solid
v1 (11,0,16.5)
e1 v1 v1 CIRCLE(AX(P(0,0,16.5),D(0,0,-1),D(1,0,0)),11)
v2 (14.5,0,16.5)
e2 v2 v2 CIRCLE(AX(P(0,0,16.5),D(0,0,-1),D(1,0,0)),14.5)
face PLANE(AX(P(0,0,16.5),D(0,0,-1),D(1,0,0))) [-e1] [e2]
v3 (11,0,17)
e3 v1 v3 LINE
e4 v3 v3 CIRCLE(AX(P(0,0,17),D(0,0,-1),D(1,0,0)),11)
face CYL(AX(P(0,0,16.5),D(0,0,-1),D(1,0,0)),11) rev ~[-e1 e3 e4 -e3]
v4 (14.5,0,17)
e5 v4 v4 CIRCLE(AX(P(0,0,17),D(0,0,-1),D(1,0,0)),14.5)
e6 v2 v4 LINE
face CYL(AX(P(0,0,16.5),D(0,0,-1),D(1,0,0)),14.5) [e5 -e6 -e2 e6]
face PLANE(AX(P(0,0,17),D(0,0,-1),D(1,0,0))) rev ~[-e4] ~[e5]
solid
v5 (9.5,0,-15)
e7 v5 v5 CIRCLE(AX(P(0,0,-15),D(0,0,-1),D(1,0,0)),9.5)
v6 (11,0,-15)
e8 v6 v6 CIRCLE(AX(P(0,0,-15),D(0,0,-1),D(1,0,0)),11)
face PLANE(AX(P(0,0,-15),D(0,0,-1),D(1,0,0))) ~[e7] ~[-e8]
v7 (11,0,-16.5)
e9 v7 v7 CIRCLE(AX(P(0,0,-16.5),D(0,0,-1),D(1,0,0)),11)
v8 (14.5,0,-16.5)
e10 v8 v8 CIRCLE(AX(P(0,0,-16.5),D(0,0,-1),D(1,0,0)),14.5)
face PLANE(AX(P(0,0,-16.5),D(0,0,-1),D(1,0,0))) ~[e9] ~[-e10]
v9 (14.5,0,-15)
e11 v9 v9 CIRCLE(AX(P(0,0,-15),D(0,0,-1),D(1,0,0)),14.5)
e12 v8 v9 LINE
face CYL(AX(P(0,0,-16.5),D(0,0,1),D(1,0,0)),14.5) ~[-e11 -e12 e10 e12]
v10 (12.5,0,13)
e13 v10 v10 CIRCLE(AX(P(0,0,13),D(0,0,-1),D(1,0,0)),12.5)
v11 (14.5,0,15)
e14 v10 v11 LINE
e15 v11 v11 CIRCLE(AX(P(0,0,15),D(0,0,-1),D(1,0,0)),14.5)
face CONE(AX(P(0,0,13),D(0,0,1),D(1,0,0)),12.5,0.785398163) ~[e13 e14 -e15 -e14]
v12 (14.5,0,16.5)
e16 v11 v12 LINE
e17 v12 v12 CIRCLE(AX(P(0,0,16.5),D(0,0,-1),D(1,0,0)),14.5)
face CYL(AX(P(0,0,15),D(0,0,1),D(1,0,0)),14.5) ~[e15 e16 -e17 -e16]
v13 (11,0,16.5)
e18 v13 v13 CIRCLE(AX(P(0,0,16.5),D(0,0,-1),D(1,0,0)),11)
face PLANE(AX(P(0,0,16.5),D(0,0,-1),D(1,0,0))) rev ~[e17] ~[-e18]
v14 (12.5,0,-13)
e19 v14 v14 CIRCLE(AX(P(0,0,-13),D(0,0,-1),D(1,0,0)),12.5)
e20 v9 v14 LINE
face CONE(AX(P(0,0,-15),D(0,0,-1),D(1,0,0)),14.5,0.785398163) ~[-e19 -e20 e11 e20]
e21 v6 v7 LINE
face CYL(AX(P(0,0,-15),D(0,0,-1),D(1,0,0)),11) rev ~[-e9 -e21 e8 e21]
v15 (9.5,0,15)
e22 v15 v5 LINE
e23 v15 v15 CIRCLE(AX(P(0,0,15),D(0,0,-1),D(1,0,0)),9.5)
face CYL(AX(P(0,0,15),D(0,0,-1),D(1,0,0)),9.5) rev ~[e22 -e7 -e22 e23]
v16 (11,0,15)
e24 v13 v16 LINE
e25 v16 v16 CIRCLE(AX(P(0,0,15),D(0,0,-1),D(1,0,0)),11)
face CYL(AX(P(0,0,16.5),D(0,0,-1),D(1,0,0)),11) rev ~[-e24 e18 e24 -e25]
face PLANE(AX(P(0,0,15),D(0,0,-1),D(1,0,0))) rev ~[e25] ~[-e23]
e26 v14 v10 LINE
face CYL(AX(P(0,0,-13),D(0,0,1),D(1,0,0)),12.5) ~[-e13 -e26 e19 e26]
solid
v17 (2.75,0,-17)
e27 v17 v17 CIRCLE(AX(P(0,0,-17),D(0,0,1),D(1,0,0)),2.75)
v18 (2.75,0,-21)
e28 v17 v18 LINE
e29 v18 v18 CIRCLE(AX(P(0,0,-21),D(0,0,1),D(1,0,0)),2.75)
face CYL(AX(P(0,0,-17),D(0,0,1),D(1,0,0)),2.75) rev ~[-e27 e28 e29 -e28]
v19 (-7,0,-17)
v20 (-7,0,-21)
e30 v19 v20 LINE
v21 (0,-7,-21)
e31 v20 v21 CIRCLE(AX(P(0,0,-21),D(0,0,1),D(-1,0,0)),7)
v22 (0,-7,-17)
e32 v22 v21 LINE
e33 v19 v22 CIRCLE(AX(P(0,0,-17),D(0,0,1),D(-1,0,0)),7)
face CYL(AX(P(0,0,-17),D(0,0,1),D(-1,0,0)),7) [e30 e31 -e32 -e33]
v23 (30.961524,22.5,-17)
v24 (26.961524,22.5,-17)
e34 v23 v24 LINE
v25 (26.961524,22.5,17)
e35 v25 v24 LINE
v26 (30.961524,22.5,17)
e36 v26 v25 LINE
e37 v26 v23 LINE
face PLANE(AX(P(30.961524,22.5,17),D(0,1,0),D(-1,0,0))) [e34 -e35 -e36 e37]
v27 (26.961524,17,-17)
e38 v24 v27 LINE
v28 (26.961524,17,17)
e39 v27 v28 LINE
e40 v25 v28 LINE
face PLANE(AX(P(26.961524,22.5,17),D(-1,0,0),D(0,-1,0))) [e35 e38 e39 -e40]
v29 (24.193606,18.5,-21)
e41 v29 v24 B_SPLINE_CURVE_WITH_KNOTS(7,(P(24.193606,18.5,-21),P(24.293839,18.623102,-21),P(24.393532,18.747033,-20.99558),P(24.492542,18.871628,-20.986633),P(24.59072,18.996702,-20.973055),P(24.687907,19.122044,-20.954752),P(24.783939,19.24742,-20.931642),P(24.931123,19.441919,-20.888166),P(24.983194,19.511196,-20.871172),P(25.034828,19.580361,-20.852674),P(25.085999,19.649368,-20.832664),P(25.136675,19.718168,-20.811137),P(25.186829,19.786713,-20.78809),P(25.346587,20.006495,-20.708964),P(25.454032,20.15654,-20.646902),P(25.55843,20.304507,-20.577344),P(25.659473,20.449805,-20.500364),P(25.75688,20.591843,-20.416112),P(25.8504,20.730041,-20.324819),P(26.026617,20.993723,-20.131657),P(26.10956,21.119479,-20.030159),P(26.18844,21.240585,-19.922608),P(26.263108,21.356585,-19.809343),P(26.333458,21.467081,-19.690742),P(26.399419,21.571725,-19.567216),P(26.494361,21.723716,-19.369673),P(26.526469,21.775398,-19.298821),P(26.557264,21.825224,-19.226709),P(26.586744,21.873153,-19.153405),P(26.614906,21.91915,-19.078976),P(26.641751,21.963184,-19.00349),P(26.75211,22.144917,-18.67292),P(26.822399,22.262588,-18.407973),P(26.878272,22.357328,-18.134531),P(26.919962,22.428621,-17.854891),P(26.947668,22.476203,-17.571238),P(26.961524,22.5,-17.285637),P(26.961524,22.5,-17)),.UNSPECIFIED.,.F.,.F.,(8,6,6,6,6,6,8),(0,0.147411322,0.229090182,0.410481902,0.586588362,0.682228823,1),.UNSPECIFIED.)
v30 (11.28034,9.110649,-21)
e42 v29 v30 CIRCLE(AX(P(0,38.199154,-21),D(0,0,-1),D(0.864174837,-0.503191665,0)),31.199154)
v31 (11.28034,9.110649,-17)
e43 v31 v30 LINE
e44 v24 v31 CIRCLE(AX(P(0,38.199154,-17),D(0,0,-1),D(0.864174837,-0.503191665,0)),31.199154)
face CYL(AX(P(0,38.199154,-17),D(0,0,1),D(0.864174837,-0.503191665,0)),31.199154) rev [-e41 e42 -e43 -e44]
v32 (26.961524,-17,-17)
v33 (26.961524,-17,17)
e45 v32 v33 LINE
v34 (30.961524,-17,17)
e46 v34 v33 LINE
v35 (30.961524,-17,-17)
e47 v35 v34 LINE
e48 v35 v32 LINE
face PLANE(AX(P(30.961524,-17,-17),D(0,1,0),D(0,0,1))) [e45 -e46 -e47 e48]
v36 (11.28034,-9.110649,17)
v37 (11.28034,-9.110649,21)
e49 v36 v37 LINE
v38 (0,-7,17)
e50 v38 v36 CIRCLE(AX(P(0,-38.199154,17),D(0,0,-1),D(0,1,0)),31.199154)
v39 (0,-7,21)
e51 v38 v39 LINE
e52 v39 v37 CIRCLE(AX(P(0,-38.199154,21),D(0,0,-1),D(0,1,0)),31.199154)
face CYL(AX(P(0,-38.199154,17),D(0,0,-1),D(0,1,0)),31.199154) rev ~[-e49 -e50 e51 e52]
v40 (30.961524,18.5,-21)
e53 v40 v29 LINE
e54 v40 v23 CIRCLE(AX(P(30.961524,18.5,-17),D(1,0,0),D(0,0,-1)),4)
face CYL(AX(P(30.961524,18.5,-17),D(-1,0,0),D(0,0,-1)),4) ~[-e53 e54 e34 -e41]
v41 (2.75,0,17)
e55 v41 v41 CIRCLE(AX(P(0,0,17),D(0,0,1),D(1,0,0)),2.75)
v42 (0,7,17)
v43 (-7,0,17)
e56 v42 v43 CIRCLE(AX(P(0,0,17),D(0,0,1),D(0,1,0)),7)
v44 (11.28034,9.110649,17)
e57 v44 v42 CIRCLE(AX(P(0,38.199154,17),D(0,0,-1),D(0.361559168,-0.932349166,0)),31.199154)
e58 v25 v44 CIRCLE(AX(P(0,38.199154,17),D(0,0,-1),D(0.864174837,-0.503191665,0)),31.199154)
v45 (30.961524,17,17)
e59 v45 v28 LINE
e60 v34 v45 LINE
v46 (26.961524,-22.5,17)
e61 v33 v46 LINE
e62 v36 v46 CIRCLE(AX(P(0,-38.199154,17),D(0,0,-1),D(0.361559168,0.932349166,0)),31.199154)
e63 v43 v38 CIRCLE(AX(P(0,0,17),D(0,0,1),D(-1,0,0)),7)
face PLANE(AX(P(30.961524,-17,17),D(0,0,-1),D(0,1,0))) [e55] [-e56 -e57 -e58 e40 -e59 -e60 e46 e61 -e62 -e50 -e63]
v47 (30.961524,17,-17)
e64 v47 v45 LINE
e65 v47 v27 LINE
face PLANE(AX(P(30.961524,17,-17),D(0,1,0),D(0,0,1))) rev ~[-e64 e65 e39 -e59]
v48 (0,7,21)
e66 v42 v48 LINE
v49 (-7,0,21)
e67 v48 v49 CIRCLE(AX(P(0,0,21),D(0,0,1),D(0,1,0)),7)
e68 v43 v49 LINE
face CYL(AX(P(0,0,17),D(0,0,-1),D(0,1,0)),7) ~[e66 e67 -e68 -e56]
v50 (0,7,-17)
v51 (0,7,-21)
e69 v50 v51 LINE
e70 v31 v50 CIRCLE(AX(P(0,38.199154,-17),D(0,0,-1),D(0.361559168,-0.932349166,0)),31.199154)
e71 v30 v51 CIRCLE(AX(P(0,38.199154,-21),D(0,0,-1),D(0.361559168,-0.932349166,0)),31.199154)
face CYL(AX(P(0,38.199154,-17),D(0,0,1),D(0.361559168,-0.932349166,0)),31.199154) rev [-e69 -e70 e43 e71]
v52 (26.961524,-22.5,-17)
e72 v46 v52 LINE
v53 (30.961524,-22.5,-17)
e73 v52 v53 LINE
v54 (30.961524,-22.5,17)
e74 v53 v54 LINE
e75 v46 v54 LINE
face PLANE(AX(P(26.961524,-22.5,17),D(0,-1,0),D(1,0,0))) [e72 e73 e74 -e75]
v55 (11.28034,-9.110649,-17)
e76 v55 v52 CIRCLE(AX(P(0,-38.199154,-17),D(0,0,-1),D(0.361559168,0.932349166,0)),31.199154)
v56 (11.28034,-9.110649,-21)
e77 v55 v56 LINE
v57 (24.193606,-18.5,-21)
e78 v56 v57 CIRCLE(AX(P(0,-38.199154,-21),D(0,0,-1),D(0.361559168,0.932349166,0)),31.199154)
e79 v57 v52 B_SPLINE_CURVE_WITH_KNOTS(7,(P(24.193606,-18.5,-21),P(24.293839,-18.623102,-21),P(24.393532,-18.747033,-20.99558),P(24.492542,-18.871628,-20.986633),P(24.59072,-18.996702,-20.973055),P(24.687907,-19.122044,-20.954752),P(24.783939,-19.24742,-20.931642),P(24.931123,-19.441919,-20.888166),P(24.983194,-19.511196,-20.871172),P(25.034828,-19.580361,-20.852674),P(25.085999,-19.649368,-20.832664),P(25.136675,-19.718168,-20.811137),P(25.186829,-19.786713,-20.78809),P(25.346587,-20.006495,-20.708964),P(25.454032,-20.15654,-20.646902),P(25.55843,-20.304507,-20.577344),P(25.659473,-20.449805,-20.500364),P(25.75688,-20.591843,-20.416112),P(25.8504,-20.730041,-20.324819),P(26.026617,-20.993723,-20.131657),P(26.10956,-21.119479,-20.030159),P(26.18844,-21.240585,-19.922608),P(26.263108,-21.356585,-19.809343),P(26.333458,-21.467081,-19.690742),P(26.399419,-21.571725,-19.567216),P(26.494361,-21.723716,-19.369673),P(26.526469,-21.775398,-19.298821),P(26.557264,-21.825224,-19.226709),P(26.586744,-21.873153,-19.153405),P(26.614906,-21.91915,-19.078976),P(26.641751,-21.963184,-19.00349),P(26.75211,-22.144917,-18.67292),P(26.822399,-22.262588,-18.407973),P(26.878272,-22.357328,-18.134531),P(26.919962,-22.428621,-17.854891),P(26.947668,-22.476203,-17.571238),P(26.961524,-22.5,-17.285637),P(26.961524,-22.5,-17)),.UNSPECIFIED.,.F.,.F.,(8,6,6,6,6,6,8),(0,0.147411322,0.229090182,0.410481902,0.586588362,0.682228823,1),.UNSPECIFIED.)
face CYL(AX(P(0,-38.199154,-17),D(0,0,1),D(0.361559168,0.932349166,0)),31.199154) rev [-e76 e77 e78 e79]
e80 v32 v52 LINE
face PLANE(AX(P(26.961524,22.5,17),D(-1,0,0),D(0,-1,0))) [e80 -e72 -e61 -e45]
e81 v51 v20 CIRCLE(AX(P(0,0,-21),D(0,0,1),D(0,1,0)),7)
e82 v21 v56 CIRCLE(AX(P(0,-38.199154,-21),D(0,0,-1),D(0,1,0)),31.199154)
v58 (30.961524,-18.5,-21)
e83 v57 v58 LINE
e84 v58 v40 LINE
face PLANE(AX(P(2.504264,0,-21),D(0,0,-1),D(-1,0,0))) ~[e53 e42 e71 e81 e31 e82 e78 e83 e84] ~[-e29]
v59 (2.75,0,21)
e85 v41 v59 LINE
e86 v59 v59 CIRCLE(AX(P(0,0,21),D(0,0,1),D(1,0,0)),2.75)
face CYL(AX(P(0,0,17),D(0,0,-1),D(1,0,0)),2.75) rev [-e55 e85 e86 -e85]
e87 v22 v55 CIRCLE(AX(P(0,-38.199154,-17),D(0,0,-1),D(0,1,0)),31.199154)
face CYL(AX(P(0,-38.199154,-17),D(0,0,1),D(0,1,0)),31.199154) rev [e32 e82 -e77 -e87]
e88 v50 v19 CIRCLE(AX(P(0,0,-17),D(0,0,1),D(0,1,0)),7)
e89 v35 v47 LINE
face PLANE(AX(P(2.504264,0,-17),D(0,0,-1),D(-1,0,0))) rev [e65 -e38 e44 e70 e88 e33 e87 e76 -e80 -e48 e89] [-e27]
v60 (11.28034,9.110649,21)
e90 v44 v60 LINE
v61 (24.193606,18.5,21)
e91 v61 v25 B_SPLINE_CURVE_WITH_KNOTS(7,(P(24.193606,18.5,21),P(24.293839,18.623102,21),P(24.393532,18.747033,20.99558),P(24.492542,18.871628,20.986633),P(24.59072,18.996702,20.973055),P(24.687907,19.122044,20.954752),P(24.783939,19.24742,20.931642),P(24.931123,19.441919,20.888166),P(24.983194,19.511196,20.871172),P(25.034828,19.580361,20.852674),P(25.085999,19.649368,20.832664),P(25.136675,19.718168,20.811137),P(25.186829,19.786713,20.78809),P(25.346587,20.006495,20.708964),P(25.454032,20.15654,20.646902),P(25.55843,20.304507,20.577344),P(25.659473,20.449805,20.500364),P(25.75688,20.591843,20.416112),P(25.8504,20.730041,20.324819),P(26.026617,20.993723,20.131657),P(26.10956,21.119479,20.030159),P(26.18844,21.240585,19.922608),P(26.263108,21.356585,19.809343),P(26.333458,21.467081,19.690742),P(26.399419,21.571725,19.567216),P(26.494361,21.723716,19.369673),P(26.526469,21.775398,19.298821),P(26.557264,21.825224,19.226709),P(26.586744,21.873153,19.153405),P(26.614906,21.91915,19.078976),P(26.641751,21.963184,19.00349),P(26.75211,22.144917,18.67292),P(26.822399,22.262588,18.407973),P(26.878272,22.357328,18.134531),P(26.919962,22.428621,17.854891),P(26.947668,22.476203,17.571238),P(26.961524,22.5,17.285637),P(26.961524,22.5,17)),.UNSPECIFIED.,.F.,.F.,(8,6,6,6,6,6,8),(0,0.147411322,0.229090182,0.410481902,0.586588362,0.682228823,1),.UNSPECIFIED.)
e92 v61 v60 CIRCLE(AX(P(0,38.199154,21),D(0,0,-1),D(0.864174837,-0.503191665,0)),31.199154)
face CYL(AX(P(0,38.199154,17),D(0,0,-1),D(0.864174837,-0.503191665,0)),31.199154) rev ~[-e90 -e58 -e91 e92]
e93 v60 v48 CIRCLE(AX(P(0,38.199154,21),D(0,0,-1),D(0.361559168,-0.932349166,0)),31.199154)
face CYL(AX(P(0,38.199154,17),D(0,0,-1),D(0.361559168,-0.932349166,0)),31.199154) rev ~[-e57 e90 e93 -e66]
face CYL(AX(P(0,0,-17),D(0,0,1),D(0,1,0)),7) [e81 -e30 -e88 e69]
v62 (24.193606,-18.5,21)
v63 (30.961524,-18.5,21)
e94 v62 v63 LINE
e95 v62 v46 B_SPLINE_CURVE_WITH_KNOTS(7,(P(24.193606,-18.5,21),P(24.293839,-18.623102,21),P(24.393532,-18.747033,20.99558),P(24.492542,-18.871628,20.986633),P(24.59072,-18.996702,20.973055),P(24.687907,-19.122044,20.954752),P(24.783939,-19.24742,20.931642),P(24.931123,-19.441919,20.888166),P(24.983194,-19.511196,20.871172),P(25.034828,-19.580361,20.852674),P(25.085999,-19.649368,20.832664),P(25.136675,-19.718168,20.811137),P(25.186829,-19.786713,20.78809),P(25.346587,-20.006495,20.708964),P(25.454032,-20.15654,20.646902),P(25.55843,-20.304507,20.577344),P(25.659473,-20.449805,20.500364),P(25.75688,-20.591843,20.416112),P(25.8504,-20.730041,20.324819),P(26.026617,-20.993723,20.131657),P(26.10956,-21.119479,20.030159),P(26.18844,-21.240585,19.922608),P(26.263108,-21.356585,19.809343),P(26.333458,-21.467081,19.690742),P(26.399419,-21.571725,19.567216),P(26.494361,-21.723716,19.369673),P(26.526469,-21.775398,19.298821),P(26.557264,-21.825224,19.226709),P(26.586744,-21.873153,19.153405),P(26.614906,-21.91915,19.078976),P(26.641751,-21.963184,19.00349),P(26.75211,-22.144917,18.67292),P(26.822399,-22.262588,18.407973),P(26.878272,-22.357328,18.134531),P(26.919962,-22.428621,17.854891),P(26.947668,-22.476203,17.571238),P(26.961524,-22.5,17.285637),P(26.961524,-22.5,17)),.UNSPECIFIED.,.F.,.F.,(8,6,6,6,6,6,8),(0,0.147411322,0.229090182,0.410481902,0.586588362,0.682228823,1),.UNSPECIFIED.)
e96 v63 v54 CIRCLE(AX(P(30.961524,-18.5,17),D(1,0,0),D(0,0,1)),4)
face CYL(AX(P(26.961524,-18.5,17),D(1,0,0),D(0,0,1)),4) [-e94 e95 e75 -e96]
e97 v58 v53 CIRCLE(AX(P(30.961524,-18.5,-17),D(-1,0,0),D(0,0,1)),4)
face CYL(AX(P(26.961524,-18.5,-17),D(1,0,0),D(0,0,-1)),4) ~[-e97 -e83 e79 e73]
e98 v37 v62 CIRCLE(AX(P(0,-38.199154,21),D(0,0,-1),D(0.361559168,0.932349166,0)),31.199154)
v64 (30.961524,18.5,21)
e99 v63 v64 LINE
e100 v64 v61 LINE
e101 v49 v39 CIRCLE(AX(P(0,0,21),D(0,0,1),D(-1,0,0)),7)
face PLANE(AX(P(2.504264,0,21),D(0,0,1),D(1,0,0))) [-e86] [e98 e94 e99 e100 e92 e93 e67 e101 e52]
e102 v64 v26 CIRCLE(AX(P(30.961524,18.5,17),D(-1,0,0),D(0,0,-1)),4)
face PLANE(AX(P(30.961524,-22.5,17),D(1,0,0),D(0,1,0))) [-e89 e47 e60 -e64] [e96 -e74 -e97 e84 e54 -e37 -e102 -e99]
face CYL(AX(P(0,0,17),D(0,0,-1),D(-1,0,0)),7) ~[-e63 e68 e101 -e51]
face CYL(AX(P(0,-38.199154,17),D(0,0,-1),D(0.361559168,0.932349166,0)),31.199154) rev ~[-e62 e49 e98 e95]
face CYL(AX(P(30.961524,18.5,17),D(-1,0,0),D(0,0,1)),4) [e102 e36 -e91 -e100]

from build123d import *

# Parameters (mm, degrees)
F2_DEPTH = 0.5
F3_R     = 2.75
F4_DEPTH = 4
F6_DEPTH = 34
F7_R     = 4
F8_W     = 34
F8_H     = 34
F9_DEPTH = 4


# Not quite as in the source:
# - a feature names something its author has since deleted; it is built from what else it names


with BuildPart() as f1:
    # F0 (on Front) → F1 (revolve)
    with BuildSketch(Plane.XZ):
        Polygon((14.5, 16.5), (11, 16.5), (11, 15), (9.5, 15), (9.5, 0), (9.5, -15), (11, -15), (11, -16.5), (14.5, -16.5), (14.5, -15), (12.5, -13), (12.5, 0), (12.5, 13), (14.5, 15), align=None)
    revolve(axis=Axis((0, 0, 0.2111420035), (0, 0, -1)))


with BuildPart() as f2:
    # F2 (new): a face of the model
    f2_faces = [f1.part.faces().sort_by_distance(p)[0] for p in [
        (-14.0898780669, 0, 16.5),
    ]]
    extrude(f2_faces, amount=F2_DEPTH)


with BuildPart() as f4:
    # F3 (on face) → F4 (new body)
    with BuildSketch(Plane.XY.offset(17)):
        with BuildLine():
            ThreePointArc((11, 0), (10.1171669047, 4.3177463824), (7.6103756686, 7.9424292369))
            ThreePointArc((7.6103756686, 7.9424292369), (3.834253209, 7.2365037118), (0, 7))
            ThreePointArc((0, 7), (-4.9497474683, 4.9497474683), (-7, 0))
            ThreePointArc((-7, 0), (-4.9497474683, -4.9497474683), (0, -7))
            ThreePointArc((0, -7), (3.834253209, -7.2365037118), (7.6103756686, -7.9424292369))
            ThreePointArc((7.6103756686, -7.9424292369), (10.1171669047, -4.3177463824), (11, 0))
        make_face()
        Circle(F3_R, mode=Mode.SUBTRACT)
        with BuildLine():
            Line((26.9615242271, -22.5), (26.9615242271, 0))
            Line((26.9615242271, 0), (26.9615242271, 22.5))
            ThreePointArc((26.9615242271, 22.5), (20.2590407655, 14.4724078126), (11.2803403418, 9.1106488118))
            ThreePointArc((11.2803403418, 9.1106488118), (13.6714105885, 4.831411028), (14.5, 0))
            ThreePointArc((14.5, 0), (13.6714105885, -4.831411028), (11.2803403418, -9.1106488118))
            ThreePointArc((11.2803403418, -9.1106488118), (20.2590407655, -14.4724078126), (26.9615242271, -22.5))
        make_face()
        Polygon((26.9615242271, 22.5), (26.9615242271, 0), (26.9615242271, -22.5), (30.9615242271, -22.5), (30.9615242271, 0), (30.9615242271, 22.5), align=None)
        with BuildLine():
            ThreePointArc((14.5, 0), (13.6714105885, 4.831411028), (11.2803403418, 9.1106488118))
            ThreePointArc((11.2803403418, 9.1106488118), (9.4634017187, 8.4698546538), (7.6103756686, 7.9424292369))
            ThreePointArc((7.6103756686, 7.9424292369), (10.1171669047, 4.3177463824), (11, 0))
            ThreePointArc((11, 0), (10.1171669047, -4.3177463824), (7.6103756686, -7.9424292369))
            ThreePointArc((7.6103756686, -7.9424292369), (9.4634017187, -8.4698546538), (11.2803403418, -9.1106488118))
            ThreePointArc((11.2803403418, -9.1106488118), (13.6714105885, -4.831411028), (14.5, 0))
        make_face()
    extrude(amount=F4_DEPTH)


with BuildPart() as f5_1:
    # F5: instance of F4
    add(f4.part.mirror(Plane.XY))


with BuildPart() as f4_1:
    add(f4.part)

    add(f5_1.part)  # F6 merges F5_1
    # F3 (on face) → F6 (join, through all)
    with BuildSketch(Plane.XY.offset(17)):
        Polygon((26.9615242271, 22.5), (26.9615242271, 0), (26.9615242271, -22.5), (30.9615242271, -22.5), (30.9615242271, 0), (30.9615242271, 22.5), align=None)
    extrude(amount=-F6_DEPTH)

    # F7
    f7_edges = [f4_1.edges().sort_by_distance(p)[0] for p in [
        (28.961524, 22.5, 21),
        (28.961524, 22.5, -21),
        (28.961524, -22.5, -21),
        (28.961524, -22.5, 21),
    ]]
    fillet(f7_edges, radius=F7_R)

    # F8 (on face) → F9 (cut, through all)
    with BuildSketch(Plane.YZ.offset(30.9615242271)):
        Rectangle(F8_W, F8_H)
    extrude(amount=-F9_DEPTH, mode=Mode.SUBTRACT)


solid = Compound([f1.part, f2.part, f4_1.part])
